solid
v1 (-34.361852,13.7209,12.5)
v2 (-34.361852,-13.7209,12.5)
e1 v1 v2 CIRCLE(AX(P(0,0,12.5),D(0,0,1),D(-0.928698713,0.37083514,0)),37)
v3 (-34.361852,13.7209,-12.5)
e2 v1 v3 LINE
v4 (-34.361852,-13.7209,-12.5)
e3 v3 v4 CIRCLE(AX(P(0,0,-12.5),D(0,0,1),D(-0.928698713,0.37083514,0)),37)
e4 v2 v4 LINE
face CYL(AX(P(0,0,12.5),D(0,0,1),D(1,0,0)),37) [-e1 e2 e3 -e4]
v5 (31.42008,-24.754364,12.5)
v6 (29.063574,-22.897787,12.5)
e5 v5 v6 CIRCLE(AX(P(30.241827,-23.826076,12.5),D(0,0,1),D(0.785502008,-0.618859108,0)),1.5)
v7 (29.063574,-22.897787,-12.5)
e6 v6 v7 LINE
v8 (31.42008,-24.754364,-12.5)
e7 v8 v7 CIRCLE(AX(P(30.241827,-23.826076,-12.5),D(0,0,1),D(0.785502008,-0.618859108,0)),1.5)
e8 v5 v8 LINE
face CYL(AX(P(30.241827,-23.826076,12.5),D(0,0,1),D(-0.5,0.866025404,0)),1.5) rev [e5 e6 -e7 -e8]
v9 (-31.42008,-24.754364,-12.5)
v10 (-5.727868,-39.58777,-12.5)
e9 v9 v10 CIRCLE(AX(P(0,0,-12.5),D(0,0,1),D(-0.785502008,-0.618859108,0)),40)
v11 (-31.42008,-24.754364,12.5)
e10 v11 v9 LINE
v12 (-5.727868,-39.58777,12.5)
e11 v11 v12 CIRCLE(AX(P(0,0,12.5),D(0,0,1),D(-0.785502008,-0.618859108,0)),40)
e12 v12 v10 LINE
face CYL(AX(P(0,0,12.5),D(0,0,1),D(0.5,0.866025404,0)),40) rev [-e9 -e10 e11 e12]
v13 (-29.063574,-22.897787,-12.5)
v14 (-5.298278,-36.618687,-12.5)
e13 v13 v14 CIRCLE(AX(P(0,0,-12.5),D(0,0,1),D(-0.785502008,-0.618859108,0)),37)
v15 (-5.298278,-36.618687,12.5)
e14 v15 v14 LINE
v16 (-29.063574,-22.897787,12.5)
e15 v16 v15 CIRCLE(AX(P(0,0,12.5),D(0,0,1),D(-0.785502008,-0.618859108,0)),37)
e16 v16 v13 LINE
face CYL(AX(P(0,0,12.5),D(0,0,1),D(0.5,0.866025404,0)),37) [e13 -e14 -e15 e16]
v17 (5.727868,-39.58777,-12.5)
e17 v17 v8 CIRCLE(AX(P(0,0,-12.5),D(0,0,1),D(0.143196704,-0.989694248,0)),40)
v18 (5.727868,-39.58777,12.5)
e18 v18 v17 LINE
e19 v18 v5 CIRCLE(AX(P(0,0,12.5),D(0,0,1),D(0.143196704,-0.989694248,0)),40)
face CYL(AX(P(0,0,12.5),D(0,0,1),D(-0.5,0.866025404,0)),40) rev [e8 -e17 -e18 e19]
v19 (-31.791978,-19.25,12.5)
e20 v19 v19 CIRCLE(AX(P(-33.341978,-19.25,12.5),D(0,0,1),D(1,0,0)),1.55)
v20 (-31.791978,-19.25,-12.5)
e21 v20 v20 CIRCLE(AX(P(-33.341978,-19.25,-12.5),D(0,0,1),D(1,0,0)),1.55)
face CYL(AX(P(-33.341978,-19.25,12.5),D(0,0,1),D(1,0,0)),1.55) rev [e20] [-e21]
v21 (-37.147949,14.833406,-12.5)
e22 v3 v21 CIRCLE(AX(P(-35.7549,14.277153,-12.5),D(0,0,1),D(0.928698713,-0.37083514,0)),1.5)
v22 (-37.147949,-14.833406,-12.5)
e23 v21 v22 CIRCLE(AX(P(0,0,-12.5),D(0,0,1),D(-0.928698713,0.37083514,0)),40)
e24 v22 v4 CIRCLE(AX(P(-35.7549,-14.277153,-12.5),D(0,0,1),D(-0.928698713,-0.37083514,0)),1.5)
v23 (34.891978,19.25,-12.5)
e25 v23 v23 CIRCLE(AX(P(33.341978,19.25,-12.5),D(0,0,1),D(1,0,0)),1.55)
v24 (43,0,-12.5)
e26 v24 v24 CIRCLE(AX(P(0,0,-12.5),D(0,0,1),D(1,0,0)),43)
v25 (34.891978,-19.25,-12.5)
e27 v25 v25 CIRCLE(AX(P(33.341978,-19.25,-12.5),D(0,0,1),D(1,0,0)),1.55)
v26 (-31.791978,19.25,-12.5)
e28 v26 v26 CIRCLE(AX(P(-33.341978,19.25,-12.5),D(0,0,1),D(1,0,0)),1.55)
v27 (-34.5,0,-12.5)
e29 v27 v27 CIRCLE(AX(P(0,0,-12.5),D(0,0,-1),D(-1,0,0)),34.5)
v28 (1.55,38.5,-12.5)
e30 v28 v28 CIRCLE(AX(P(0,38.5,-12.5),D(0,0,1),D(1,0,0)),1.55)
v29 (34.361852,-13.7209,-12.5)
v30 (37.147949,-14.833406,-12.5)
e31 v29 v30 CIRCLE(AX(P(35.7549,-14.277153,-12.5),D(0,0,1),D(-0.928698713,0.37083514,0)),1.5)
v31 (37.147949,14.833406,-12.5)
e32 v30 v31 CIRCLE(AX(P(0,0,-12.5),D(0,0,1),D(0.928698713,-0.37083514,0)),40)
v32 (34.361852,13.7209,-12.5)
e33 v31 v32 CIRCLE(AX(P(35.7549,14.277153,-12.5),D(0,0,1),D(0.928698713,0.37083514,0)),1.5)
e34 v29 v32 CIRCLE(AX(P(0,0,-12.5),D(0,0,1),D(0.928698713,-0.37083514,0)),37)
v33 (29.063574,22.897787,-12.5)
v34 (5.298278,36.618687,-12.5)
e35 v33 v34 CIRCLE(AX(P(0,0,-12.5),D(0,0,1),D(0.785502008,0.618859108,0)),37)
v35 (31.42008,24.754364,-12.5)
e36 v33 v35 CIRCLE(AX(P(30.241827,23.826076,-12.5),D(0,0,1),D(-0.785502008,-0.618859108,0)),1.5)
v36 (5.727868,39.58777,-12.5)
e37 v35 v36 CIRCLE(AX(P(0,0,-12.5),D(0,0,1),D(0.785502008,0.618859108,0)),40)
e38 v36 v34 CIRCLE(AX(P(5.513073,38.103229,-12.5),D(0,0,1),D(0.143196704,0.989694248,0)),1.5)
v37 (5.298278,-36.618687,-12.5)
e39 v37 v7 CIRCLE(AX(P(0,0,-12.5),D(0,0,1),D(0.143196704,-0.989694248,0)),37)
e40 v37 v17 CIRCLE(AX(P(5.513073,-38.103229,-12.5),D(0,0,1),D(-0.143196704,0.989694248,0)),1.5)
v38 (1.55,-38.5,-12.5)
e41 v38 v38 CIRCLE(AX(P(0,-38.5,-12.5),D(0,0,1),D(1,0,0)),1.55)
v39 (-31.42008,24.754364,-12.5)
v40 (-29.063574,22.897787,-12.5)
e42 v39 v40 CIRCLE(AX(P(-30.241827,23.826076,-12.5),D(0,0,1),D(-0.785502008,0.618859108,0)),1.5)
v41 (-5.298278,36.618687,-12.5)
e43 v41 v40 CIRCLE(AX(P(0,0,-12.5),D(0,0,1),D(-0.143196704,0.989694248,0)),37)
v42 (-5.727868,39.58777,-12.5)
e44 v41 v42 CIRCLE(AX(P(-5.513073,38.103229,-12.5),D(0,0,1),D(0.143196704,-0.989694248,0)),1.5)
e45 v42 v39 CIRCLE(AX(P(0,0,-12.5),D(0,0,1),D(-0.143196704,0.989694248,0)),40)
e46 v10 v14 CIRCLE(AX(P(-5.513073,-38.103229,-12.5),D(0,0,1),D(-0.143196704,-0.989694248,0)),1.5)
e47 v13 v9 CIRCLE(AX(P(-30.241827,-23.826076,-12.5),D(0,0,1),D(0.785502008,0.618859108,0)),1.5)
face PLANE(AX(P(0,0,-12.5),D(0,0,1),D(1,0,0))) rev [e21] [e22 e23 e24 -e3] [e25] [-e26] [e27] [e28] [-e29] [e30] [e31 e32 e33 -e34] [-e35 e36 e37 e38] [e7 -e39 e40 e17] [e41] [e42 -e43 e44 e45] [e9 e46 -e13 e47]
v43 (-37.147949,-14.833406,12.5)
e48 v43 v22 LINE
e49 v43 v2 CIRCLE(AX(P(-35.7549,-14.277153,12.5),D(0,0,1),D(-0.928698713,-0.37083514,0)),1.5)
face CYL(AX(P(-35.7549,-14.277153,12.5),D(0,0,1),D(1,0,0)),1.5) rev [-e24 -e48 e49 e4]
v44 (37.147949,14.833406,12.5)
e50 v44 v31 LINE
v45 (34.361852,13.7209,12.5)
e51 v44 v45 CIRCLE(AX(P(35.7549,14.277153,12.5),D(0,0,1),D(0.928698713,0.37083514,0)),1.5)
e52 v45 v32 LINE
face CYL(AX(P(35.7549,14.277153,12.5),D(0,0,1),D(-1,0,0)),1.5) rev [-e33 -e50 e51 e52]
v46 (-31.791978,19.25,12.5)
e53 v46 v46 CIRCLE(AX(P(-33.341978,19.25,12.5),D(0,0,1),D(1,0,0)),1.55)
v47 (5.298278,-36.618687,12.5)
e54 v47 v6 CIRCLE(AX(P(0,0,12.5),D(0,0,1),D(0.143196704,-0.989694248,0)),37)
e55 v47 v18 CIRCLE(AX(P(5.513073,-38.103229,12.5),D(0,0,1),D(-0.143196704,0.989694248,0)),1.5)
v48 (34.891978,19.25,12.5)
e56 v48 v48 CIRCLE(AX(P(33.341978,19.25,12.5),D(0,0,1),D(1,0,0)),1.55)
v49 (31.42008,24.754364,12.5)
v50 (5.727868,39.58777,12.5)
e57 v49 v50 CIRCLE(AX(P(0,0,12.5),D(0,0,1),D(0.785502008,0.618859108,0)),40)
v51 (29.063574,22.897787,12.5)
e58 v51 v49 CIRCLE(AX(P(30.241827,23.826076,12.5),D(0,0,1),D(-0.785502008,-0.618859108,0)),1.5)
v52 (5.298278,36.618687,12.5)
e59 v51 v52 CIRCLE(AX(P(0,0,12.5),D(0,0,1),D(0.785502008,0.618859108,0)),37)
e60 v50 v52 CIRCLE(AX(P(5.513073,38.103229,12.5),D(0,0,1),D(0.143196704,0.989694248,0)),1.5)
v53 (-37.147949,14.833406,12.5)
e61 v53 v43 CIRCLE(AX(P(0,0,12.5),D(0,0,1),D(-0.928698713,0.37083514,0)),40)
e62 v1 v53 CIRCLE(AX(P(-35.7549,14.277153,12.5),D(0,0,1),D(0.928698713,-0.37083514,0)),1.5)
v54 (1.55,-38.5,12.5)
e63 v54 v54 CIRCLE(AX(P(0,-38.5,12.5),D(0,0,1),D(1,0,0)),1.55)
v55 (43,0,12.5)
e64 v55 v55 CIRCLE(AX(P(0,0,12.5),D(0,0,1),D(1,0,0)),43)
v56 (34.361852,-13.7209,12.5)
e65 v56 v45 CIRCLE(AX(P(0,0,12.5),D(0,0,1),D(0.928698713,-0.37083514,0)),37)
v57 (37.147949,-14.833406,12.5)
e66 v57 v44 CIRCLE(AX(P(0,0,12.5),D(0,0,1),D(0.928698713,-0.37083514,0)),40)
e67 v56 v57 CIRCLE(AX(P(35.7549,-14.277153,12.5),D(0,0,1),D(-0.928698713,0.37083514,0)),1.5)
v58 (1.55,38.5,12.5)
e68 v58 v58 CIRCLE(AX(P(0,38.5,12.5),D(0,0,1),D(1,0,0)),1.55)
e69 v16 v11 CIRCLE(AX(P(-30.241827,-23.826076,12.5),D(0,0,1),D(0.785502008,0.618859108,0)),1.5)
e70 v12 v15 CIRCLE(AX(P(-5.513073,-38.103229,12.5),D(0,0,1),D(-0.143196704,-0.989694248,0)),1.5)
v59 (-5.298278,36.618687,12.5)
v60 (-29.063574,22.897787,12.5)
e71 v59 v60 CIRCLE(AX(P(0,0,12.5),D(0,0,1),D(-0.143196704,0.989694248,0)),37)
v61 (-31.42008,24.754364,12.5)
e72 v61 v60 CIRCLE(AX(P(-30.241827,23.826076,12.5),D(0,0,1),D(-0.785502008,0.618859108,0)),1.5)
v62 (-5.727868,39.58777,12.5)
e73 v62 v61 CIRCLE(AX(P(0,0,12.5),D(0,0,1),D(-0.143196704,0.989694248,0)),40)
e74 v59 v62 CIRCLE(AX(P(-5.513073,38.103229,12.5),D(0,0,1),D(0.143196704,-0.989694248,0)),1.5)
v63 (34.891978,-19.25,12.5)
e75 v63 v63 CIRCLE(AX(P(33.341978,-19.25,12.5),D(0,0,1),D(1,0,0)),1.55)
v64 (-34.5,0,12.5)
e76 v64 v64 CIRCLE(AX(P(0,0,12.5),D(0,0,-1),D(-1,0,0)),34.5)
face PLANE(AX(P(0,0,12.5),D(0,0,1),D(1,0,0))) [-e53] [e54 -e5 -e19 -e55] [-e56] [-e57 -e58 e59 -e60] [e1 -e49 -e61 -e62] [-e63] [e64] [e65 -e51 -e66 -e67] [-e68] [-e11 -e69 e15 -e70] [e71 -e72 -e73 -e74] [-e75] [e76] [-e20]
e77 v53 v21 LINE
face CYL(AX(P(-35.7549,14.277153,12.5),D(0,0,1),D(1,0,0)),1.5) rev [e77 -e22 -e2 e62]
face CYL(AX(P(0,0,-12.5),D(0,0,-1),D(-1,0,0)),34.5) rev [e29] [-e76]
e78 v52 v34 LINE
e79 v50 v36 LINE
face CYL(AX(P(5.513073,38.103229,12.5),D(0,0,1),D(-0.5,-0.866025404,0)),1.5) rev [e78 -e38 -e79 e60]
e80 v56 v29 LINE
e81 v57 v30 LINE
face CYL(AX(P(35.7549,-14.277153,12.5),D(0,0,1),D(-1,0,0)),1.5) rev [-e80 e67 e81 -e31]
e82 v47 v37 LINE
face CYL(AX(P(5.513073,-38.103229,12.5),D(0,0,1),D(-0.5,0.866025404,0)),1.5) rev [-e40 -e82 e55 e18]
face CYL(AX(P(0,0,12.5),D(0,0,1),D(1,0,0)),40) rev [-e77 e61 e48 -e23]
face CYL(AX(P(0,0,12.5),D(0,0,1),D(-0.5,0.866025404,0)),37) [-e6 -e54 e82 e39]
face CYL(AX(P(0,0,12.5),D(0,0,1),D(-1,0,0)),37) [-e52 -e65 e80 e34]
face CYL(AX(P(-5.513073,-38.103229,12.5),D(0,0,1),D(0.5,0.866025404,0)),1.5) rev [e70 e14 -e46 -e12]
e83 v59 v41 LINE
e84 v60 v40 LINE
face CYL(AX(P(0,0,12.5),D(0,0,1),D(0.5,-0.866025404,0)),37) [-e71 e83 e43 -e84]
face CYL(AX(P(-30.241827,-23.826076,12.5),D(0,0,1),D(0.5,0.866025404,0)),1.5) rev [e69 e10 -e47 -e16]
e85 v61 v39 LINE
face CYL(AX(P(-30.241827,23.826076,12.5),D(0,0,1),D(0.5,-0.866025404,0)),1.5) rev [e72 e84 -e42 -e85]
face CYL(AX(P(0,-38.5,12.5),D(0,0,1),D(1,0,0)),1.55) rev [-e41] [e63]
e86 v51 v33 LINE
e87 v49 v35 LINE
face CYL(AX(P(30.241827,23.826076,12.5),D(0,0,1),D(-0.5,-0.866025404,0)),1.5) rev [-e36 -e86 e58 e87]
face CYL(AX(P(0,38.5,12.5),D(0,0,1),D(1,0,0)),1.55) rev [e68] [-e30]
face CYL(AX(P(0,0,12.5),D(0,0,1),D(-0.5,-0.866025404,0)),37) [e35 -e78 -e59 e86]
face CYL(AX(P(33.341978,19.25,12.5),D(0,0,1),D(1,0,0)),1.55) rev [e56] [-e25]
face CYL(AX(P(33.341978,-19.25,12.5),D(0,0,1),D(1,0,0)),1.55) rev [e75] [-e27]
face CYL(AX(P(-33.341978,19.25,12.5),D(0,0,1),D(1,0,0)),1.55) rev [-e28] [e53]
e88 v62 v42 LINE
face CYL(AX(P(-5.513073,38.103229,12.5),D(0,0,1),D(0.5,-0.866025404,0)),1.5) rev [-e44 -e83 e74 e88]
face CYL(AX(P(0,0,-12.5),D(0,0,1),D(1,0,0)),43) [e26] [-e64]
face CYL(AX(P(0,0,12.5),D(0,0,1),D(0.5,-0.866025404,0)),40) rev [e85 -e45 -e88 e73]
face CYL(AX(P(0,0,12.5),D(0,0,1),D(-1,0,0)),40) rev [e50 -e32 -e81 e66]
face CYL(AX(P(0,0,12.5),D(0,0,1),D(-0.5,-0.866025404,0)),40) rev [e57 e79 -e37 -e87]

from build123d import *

# Parameters (mm, degrees)
HOLE_START                        = -12.5
HOLE_WIZARD_3_1_3_1_6_OUTLINE_R   = 43
HOLE_WIZARD_3_1_3_1_6_OUTLINE_R_2 = 1.55
HOLE_WIZARD_3_1_3_1_6_DEPTH       = 25
HOLE_WIZARD_3_1_3_1_5_D           = 3.1
HOLE_WIZARD_3_1_3_1_4_D           = 3.1
HOLE_WIZARD_3_1_3_1_3_D           = 3.1
HOLE_WIZARD_3_1_3_1_2_D           = 3.1
HOLE_WIZARD_3_1_3_1_1_D           = 3.1
HOLE_WIZARD_M64_1_D               = 69


with BuildPart() as part:
    # Ø3.1 (3.1) 直径孔6: read off the stored shape, not the designer's step
    # Ø3.1 (3.1) 直径孔6 outline → Ø3.1 (3.1) 直径孔6 (new body)
    with BuildSketch(Plane.XY.offset(HOLE_START)):
        Circle(HOLE_WIZARD_3_1_3_1_6_OUTLINE_R)
        with BuildLine():
            ThreePointArc((-31.420080332, -24.7543643), (-31.170115981, -22.647822626), (-29.063574308, -22.897786978))
            ThreePointArc((-29.063574308, -22.897786978), (-18.5, -32.04293994), (-5.298278059, -36.618687164))
            ThreePointArc((-5.298278059, -36.618687164), (-4.028531744, -38.318023592), (-5.727868172, -39.587769907))
            ThreePointArc((-5.727868172, -39.587769907), (-20, -34.641016151), (-31.420080332, -24.7543643))
        make_face(mode=Mode.SUBTRACT)
        with Locations((0, -38.5)):
            Circle(HOLE_WIZARD_3_1_3_1_6_OUTLINE_R_2, mode=Mode.SUBTRACT)
        with BuildLine():
            ThreePointArc((5.727868172, -39.587769907), (4.028531744, -38.318023592), (5.298278059, -36.618687164))
            ThreePointArc((5.298278059, -36.618687164), (18.5, -32.04293994), (29.063574308, -22.897786978))
            ThreePointArc((29.063574308, -22.897786978), (31.170115981, -22.647822626), (31.420080332, -24.7543643))
            ThreePointArc((31.420080332, -24.7543643), (20, -34.641016151), (5.727868172, -39.587769907))
        make_face(mode=Mode.SUBTRACT)
        with BuildLine():
            ThreePointArc((-37.147948505, 14.833405607), (-35.198647726, 15.670200965), (-34.361852367, 13.720900186))
            ThreePointArc((-34.361852367, 13.720900186), (-37, 0), (-34.361852367, -13.720900186))
            ThreePointArc((-34.361852367, -13.720900186), (-35.198647726, -15.670200965), (-37.147948505, -14.833405607))
            ThreePointArc((-37.147948505, -14.833405607), (-40, 0), (-37.147948505, 14.833405607))
        make_face(mode=Mode.SUBTRACT)
        with BuildLine():
            ThreePointArc((-5.727868172, 39.587769907), (-4.028531744, 38.318023592), (-5.298278059, 36.618687164))
            ThreePointArc((-5.298278059, 36.618687164), (-18.5, 32.04293994), (-29.063574308, 22.897786978))
            ThreePointArc((-29.063574308, 22.897786978), (-31.170115981, 22.647822626), (-31.420080332, 24.7543643))
            ThreePointArc((-31.420080332, 24.7543643), (-20, 34.641016151), (-5.727868172, 39.587769907))
        make_face(mode=Mode.SUBTRACT)
        with BuildLine():
            ThreePointArc((37.147948505, -14.833405607), (35.198647726, -15.670200965), (34.361852367, -13.720900186))
            ThreePointArc((34.361852367, -13.720900186), (37, 0), (34.361852367, 13.720900186))
            ThreePointArc((34.361852367, 13.720900186), (35.198647726, 15.670200965), (37.147948505, 14.833405607))
            ThreePointArc((37.147948505, 14.833405607), (40, 0), (37.147948505, -14.833405607))
        make_face(mode=Mode.SUBTRACT)
        with BuildLine():
            ThreePointArc((31.420080332, 24.7543643), (31.170115981, 22.647822626), (29.063574308, 22.897786978))
            ThreePointArc((29.063574308, 22.897786978), (18.5, 32.04293994), (5.298278059, 36.618687164))
            ThreePointArc((5.298278059, 36.618687164), (4.028531744, 38.318023592), (5.727868172, 39.587769907))
            ThreePointArc((5.727868172, 39.587769907), (20, 34.641016151), (31.420080332, 24.7543643))
        make_face(mode=Mode.SUBTRACT)
    extrude(amount=HOLE_WIZARD_3_1_3_1_6_DEPTH)

    # Ø3.1 (3.1) 直径孔5 (through all)
    with Locations(Plane.XY.offset(12.5)):
        with Locations((33.341978046, -19.25)):
            Hole(HOLE_WIZARD_3_1_3_1_5_D / 2)

    # Ø3.1 (3.1) 直径孔4 (through all)
    with Locations(Plane.XY.offset(12.5)):
        with Locations((33.341978046, 19.25)):
            Hole(HOLE_WIZARD_3_1_3_1_4_D / 2)

    # Ø3.1 (3.1) 直径孔3 (through all)
    with Locations(Plane.XY.offset(12.5)):
        with Locations((0, 38.5)):
            Hole(HOLE_WIZARD_3_1_3_1_3_D / 2)

    # Ø3.1 (3.1) 直径孔2 (through all)
    with Locations(Plane.XY.offset(12.5)):
        with Locations((-33.341978046, 19.25)):
            Hole(HOLE_WIZARD_3_1_3_1_2_D / 2)

    # Ø3.1 (3.1) 直径孔1 (through all)
    with Locations(Plane.XY.offset(12.5)):
        with Locations((-33.341978046, -19.25)):
            Hole(HOLE_WIZARD_3_1_3_1_1_D / 2)

    # M64 间隙孔1 (through all)
    with Locations(Plane(origin=(0, 0, -12.5), x_dir=(-1, 0, 0), z_dir=(0, 0, -1))):
        with Locations((0, 0)):
            Hole(HOLE_WIZARD_M64_1_D / 2)


solid = part.part
